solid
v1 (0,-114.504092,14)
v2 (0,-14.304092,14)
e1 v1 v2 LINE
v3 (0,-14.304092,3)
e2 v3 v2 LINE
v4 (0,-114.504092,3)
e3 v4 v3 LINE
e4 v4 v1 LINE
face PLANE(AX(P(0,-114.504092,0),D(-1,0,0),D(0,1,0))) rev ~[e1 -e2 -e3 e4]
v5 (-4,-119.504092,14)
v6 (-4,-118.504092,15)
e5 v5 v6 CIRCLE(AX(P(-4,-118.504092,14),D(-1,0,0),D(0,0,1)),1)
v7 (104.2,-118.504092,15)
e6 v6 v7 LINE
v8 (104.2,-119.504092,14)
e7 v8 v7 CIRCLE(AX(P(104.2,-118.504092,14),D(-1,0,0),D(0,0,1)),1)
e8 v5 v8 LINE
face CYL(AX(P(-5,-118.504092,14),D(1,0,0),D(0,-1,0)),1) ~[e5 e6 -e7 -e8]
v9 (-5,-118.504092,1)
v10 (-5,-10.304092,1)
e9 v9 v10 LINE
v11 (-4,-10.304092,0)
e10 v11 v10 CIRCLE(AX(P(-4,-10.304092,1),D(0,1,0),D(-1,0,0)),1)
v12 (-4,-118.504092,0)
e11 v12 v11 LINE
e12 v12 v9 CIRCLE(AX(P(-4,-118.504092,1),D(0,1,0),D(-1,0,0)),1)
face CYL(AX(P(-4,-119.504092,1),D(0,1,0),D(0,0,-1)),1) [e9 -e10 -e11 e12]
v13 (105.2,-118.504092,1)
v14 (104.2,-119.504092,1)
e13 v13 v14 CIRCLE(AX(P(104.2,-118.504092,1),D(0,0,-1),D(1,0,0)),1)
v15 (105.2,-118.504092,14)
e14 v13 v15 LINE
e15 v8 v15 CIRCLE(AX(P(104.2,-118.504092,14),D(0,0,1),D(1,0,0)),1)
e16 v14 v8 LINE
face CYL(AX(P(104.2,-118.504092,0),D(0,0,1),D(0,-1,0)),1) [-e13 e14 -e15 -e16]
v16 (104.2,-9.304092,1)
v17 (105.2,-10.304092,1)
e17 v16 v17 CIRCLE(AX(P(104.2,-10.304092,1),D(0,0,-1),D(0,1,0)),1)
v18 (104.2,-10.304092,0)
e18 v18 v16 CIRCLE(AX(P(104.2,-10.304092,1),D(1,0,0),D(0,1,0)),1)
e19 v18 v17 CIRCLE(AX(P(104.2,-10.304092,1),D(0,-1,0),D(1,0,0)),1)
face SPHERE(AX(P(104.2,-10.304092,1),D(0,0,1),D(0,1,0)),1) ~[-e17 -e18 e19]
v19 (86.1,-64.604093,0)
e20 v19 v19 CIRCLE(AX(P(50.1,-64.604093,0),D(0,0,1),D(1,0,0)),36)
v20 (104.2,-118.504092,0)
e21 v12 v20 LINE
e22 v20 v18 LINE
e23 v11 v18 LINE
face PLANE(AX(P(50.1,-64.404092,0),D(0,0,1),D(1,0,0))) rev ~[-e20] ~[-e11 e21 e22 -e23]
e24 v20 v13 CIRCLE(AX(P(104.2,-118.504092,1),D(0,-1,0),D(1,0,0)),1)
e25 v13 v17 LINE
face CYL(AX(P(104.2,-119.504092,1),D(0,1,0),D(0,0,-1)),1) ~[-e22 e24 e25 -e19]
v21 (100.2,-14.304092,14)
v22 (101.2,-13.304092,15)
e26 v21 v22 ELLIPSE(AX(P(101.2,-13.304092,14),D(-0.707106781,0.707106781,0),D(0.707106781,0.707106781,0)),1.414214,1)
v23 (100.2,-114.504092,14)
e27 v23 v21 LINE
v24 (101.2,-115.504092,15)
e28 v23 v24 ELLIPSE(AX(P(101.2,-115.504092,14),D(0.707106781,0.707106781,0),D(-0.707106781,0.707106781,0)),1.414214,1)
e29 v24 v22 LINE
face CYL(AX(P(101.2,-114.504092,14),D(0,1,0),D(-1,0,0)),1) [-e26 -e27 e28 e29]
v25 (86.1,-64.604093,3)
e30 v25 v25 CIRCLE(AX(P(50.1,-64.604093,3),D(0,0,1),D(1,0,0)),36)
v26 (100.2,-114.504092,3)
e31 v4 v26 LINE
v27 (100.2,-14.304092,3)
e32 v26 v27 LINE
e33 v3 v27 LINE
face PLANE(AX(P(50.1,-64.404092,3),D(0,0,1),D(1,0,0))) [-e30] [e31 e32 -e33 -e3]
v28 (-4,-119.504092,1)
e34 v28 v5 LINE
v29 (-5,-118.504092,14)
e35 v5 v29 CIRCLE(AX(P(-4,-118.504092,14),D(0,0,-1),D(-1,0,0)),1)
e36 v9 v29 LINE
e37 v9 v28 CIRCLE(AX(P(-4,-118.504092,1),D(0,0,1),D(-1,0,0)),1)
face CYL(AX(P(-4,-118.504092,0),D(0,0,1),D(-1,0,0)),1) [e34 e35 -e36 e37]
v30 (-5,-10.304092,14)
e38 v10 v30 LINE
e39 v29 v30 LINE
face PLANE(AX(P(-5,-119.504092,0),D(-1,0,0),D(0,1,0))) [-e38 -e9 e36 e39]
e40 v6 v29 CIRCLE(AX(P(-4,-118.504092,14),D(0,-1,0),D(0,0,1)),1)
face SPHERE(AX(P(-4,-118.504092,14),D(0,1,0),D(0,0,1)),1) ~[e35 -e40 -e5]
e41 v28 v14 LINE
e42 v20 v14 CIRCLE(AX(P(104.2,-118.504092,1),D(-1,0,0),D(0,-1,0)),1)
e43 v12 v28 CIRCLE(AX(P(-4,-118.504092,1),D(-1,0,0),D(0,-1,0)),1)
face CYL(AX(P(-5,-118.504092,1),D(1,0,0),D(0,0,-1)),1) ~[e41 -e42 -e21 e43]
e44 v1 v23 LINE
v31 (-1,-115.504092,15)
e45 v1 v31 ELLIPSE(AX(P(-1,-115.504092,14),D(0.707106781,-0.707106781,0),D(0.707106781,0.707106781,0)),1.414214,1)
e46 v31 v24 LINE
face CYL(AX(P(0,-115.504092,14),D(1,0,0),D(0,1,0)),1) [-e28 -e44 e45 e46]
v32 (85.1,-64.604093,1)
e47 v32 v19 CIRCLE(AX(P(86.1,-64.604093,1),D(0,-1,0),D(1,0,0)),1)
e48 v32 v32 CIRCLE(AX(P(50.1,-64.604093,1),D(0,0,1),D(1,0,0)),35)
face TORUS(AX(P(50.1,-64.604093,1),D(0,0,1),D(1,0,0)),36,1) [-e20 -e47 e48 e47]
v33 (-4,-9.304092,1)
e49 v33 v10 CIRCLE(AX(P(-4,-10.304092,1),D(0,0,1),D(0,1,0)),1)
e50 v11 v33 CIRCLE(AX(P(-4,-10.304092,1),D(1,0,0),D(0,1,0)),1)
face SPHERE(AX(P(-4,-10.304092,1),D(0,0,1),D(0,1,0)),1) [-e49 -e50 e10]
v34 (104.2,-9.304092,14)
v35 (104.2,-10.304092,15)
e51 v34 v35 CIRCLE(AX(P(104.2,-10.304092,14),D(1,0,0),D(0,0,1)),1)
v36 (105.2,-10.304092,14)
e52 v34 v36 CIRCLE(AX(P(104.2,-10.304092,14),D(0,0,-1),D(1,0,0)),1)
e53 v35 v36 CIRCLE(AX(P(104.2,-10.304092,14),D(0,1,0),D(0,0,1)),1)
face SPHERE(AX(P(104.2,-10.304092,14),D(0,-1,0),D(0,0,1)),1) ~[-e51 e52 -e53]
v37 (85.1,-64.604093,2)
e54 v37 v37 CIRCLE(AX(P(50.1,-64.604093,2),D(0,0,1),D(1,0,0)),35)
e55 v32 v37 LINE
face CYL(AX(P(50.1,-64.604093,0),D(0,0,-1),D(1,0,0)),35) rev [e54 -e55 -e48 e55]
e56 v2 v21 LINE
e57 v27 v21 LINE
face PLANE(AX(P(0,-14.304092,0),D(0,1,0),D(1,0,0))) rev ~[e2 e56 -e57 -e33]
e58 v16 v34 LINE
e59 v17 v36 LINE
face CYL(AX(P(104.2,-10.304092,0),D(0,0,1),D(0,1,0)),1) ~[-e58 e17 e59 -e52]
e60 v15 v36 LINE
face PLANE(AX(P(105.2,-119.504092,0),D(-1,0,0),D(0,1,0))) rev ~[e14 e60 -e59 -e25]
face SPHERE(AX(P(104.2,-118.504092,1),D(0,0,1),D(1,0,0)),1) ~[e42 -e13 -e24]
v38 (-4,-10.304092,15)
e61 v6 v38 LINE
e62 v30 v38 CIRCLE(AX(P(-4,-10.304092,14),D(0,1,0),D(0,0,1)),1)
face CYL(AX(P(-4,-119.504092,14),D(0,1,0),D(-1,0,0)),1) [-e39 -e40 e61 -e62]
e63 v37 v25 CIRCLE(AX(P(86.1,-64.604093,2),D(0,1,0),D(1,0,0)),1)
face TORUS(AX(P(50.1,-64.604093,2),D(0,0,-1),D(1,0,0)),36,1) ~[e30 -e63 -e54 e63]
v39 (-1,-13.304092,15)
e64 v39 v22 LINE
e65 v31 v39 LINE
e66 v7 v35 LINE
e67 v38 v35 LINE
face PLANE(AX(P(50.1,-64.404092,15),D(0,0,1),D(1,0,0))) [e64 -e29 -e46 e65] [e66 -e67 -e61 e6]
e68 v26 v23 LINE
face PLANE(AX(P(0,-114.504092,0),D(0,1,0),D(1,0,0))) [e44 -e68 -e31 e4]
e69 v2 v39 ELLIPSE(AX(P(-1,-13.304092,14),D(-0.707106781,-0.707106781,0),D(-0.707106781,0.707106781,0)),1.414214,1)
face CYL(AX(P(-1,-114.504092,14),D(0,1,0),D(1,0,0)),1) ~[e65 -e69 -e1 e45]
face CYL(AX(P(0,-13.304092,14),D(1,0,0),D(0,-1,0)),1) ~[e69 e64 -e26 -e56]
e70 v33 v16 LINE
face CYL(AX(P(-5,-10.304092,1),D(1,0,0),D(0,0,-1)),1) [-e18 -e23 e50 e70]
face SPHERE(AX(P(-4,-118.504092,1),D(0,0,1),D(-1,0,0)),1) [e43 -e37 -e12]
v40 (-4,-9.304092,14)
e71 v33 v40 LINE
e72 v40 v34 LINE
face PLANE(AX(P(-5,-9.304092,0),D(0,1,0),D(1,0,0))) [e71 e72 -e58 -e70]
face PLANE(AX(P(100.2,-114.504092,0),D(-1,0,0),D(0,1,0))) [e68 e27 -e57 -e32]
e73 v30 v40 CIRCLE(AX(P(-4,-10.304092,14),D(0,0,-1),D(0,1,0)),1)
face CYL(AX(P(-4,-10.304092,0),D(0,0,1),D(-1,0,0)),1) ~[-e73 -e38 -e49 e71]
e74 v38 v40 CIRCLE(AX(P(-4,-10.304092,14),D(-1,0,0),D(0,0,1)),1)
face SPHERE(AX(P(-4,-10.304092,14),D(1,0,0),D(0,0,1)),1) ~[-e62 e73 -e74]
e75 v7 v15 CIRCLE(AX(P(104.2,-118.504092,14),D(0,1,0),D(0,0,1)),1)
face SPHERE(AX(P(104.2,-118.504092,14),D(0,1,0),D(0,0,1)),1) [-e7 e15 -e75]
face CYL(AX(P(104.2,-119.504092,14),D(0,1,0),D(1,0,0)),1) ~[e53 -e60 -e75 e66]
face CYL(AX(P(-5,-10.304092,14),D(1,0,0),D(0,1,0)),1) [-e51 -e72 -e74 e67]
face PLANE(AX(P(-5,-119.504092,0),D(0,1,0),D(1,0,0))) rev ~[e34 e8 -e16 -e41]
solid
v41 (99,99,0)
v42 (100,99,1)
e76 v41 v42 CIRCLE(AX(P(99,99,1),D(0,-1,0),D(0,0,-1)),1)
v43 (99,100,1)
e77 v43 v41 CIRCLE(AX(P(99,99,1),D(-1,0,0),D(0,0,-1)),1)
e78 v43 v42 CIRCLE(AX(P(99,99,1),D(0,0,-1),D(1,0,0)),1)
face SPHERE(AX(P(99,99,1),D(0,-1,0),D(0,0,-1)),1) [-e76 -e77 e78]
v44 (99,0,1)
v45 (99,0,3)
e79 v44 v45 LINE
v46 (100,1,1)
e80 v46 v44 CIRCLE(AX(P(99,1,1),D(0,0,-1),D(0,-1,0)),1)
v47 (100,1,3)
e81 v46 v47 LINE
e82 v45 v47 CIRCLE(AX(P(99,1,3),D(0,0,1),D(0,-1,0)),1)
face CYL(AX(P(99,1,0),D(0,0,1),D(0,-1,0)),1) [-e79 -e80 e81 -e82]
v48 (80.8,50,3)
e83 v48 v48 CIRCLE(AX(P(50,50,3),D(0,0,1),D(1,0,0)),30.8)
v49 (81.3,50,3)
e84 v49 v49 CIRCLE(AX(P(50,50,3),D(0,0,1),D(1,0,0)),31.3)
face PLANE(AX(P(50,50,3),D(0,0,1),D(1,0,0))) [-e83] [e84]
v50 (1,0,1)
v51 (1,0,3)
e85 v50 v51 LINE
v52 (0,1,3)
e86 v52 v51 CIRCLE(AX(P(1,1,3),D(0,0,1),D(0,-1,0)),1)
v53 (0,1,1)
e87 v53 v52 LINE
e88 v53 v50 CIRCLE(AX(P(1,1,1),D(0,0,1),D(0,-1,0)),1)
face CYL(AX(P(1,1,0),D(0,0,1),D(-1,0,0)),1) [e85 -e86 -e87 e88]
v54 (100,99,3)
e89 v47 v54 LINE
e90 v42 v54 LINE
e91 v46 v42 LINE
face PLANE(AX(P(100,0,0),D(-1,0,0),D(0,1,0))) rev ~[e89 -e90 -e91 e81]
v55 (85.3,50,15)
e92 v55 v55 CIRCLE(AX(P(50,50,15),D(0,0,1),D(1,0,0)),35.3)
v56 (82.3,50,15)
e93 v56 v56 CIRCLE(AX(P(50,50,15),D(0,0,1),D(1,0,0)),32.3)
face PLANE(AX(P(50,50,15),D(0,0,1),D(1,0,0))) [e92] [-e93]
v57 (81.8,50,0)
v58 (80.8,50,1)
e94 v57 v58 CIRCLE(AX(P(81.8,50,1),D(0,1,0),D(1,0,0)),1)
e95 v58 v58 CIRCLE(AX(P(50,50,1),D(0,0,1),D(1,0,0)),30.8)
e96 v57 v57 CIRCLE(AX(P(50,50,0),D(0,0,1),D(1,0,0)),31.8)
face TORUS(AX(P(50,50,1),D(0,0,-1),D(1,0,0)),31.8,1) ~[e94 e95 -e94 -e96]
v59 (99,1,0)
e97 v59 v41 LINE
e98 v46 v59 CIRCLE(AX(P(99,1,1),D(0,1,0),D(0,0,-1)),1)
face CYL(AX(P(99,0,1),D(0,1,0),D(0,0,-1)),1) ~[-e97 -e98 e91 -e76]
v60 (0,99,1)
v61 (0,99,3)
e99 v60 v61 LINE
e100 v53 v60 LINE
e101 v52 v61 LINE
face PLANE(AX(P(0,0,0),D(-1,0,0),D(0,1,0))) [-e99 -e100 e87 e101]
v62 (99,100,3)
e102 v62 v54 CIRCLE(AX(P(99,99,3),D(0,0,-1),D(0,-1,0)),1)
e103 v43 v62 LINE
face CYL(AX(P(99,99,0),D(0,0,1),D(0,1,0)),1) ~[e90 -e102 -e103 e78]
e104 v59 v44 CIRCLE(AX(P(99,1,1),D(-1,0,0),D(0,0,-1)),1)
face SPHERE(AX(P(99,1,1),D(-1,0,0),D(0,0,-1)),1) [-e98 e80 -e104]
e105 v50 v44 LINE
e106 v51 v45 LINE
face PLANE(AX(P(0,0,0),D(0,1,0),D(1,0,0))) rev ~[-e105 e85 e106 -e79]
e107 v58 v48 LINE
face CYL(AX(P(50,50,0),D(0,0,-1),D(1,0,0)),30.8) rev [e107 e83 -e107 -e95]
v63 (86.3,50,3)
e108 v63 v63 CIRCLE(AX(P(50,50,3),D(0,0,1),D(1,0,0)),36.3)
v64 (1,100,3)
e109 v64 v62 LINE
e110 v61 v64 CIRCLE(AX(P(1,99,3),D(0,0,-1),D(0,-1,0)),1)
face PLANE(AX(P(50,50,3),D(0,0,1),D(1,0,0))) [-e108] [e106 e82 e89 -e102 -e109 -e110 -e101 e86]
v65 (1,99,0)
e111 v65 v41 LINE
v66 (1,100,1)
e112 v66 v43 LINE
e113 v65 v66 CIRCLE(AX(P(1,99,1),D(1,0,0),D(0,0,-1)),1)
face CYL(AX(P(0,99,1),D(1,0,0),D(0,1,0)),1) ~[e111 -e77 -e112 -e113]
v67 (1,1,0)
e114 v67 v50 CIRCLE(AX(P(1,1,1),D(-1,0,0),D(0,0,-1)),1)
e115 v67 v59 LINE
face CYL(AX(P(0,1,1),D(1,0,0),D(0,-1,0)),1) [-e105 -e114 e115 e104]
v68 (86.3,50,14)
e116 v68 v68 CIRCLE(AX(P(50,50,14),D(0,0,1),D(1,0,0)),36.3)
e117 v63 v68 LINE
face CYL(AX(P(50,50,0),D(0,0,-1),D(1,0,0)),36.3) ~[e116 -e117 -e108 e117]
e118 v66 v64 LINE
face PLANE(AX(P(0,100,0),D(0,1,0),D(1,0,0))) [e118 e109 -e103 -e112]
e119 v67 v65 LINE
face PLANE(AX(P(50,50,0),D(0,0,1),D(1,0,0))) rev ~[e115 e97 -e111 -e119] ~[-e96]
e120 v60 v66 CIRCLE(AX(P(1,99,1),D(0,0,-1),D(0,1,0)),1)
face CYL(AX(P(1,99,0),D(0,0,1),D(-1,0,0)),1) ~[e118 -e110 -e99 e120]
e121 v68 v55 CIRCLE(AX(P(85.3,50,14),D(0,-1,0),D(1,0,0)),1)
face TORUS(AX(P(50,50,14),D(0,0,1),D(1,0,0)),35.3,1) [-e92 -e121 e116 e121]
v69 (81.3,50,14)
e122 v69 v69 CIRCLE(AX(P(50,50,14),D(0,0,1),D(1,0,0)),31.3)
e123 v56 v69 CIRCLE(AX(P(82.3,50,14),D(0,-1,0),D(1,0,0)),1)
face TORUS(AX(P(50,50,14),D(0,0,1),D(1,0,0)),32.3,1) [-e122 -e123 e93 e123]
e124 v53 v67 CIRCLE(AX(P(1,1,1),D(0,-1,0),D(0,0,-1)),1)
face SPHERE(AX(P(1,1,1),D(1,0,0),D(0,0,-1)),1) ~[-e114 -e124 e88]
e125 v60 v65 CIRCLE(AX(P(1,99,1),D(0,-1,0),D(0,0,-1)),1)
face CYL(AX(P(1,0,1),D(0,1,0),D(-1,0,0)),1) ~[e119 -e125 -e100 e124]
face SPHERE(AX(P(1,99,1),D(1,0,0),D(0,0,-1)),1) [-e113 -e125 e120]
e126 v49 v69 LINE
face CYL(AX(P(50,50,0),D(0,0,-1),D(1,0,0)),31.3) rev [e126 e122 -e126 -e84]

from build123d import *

# Parameters (mm, degrees)
F0_R     = 36.3
F0_R_2   = 31.3
F1_DEPTH = 15
F0_W     = 110.2
F0_H     = 110.2
F0_W_2   = 100.2
F0_H_2   = 100.2
F0_W_3   = 100
F0_H_3   = 100
F0_R_3   = 30.8
F2_DEPTH = 3
F0_R_4   = 35
F3_R     = 1
F3_2_R   = 1


# Not quite as in the source:
# - a feature names something its author has since deleted; it is built from what else it names


with BuildPart() as f1:
    # F0 (on Top) → F1 (new body)
    with BuildSketch(Plane.XY):
        with Locations((50, 50)):
            Circle(F0_R)
        with Locations((50, 50)):
            Circle(F0_R_2, mode=Mode.SUBTRACT)
    extrude(amount=F1_DEPTH)

    # F0 (on Top) → F2 (join)
    with BuildSketch(Plane.XY):
        with Locations((50, 50)):
            Rectangle(F0_W_3, F0_H_3)
        with Locations((50, 50)):
            Circle(F0_R, mode=Mode.SUBTRACT)
        with Locations((50, 50)):
            Circle(F0_R_2)
        with Locations((50, 50)):
            Circle(F0_R_3, mode=Mode.SUBTRACT)
    extrude(amount=F2_DEPTH)

    # F3
    f3_edges = [f1.edges().sort_by_distance(p)[0] for p in [
        (18.7, 50, 15),
        (13.7, 50, 15),
        (50, 0, 0),
        (100, 50, 0),
        (50, 100, 0),
        (0, 50, 0),
        (19.2, 50, 0),
        (100, 100, 1.5),
        (0, 100, 1.5),
        (0, 0, 1.5),
        (100, 0, 1.5),
    ]]
    fillet(f3_edges, radius=F3_R)


with BuildPart() as f1b:
    # F0 (on Top) → F1, piece 2 (new body)
    with BuildSketch(Plane.XY):
        with Locations((50.1000001118, -64.4040923819)):
            Rectangle(F0_W, F0_H)
        with Locations((50.1, -64.4040924937)):
            Rectangle(F0_W_2, F0_H_2, mode=Mode.SUBTRACT)
    extrude(amount=F1_DEPTH)

    # F0 (on Top) → F2, piece 2 (join)
    with BuildSketch(Plane.XY):
        with Locations((50.1, -64.4040924937)):
            Rectangle(F0_W_2, F0_H_2)
        with Locations((50.1, -64.6040926054)):
            Circle(F0_R_4, mode=Mode.SUBTRACT)
    extrude(amount=F2_DEPTH)

    # F3#2
    f3_2_edges = [f1b.edges().sort_by_distance(p)[0] for p in [
        (105.2, -64.404092, 15),
        (50.1, -9.304092, 15),
        (-5, -64.404092, 15),
        (50.1, -119.504092, 15),
        (-5, -119.504092, 7.5),
        (105.2, -119.504092, 7.5),
        (105.2, -9.304092, 7.5),
        (-5, -9.304092, 7.5),
        (50.1, -9.304092, 0),
        (105.2, -64.404092, 0),
        (15.1, -64.604093, 0),
        (-5, -64.404092, 0),
        (50.1, -119.504092, 0),
        (15.1, -64.604093, 3),
        (0, -64.404092, 15),
        (50.1, -14.304092, 15),
        (100.2, -64.404092, 15),
        (50.1, -114.504092, 15),
    ]]
    fillet(f3_2_edges, radius=F3_2_R)


solid = Compound([f1.part, f1b.part])
